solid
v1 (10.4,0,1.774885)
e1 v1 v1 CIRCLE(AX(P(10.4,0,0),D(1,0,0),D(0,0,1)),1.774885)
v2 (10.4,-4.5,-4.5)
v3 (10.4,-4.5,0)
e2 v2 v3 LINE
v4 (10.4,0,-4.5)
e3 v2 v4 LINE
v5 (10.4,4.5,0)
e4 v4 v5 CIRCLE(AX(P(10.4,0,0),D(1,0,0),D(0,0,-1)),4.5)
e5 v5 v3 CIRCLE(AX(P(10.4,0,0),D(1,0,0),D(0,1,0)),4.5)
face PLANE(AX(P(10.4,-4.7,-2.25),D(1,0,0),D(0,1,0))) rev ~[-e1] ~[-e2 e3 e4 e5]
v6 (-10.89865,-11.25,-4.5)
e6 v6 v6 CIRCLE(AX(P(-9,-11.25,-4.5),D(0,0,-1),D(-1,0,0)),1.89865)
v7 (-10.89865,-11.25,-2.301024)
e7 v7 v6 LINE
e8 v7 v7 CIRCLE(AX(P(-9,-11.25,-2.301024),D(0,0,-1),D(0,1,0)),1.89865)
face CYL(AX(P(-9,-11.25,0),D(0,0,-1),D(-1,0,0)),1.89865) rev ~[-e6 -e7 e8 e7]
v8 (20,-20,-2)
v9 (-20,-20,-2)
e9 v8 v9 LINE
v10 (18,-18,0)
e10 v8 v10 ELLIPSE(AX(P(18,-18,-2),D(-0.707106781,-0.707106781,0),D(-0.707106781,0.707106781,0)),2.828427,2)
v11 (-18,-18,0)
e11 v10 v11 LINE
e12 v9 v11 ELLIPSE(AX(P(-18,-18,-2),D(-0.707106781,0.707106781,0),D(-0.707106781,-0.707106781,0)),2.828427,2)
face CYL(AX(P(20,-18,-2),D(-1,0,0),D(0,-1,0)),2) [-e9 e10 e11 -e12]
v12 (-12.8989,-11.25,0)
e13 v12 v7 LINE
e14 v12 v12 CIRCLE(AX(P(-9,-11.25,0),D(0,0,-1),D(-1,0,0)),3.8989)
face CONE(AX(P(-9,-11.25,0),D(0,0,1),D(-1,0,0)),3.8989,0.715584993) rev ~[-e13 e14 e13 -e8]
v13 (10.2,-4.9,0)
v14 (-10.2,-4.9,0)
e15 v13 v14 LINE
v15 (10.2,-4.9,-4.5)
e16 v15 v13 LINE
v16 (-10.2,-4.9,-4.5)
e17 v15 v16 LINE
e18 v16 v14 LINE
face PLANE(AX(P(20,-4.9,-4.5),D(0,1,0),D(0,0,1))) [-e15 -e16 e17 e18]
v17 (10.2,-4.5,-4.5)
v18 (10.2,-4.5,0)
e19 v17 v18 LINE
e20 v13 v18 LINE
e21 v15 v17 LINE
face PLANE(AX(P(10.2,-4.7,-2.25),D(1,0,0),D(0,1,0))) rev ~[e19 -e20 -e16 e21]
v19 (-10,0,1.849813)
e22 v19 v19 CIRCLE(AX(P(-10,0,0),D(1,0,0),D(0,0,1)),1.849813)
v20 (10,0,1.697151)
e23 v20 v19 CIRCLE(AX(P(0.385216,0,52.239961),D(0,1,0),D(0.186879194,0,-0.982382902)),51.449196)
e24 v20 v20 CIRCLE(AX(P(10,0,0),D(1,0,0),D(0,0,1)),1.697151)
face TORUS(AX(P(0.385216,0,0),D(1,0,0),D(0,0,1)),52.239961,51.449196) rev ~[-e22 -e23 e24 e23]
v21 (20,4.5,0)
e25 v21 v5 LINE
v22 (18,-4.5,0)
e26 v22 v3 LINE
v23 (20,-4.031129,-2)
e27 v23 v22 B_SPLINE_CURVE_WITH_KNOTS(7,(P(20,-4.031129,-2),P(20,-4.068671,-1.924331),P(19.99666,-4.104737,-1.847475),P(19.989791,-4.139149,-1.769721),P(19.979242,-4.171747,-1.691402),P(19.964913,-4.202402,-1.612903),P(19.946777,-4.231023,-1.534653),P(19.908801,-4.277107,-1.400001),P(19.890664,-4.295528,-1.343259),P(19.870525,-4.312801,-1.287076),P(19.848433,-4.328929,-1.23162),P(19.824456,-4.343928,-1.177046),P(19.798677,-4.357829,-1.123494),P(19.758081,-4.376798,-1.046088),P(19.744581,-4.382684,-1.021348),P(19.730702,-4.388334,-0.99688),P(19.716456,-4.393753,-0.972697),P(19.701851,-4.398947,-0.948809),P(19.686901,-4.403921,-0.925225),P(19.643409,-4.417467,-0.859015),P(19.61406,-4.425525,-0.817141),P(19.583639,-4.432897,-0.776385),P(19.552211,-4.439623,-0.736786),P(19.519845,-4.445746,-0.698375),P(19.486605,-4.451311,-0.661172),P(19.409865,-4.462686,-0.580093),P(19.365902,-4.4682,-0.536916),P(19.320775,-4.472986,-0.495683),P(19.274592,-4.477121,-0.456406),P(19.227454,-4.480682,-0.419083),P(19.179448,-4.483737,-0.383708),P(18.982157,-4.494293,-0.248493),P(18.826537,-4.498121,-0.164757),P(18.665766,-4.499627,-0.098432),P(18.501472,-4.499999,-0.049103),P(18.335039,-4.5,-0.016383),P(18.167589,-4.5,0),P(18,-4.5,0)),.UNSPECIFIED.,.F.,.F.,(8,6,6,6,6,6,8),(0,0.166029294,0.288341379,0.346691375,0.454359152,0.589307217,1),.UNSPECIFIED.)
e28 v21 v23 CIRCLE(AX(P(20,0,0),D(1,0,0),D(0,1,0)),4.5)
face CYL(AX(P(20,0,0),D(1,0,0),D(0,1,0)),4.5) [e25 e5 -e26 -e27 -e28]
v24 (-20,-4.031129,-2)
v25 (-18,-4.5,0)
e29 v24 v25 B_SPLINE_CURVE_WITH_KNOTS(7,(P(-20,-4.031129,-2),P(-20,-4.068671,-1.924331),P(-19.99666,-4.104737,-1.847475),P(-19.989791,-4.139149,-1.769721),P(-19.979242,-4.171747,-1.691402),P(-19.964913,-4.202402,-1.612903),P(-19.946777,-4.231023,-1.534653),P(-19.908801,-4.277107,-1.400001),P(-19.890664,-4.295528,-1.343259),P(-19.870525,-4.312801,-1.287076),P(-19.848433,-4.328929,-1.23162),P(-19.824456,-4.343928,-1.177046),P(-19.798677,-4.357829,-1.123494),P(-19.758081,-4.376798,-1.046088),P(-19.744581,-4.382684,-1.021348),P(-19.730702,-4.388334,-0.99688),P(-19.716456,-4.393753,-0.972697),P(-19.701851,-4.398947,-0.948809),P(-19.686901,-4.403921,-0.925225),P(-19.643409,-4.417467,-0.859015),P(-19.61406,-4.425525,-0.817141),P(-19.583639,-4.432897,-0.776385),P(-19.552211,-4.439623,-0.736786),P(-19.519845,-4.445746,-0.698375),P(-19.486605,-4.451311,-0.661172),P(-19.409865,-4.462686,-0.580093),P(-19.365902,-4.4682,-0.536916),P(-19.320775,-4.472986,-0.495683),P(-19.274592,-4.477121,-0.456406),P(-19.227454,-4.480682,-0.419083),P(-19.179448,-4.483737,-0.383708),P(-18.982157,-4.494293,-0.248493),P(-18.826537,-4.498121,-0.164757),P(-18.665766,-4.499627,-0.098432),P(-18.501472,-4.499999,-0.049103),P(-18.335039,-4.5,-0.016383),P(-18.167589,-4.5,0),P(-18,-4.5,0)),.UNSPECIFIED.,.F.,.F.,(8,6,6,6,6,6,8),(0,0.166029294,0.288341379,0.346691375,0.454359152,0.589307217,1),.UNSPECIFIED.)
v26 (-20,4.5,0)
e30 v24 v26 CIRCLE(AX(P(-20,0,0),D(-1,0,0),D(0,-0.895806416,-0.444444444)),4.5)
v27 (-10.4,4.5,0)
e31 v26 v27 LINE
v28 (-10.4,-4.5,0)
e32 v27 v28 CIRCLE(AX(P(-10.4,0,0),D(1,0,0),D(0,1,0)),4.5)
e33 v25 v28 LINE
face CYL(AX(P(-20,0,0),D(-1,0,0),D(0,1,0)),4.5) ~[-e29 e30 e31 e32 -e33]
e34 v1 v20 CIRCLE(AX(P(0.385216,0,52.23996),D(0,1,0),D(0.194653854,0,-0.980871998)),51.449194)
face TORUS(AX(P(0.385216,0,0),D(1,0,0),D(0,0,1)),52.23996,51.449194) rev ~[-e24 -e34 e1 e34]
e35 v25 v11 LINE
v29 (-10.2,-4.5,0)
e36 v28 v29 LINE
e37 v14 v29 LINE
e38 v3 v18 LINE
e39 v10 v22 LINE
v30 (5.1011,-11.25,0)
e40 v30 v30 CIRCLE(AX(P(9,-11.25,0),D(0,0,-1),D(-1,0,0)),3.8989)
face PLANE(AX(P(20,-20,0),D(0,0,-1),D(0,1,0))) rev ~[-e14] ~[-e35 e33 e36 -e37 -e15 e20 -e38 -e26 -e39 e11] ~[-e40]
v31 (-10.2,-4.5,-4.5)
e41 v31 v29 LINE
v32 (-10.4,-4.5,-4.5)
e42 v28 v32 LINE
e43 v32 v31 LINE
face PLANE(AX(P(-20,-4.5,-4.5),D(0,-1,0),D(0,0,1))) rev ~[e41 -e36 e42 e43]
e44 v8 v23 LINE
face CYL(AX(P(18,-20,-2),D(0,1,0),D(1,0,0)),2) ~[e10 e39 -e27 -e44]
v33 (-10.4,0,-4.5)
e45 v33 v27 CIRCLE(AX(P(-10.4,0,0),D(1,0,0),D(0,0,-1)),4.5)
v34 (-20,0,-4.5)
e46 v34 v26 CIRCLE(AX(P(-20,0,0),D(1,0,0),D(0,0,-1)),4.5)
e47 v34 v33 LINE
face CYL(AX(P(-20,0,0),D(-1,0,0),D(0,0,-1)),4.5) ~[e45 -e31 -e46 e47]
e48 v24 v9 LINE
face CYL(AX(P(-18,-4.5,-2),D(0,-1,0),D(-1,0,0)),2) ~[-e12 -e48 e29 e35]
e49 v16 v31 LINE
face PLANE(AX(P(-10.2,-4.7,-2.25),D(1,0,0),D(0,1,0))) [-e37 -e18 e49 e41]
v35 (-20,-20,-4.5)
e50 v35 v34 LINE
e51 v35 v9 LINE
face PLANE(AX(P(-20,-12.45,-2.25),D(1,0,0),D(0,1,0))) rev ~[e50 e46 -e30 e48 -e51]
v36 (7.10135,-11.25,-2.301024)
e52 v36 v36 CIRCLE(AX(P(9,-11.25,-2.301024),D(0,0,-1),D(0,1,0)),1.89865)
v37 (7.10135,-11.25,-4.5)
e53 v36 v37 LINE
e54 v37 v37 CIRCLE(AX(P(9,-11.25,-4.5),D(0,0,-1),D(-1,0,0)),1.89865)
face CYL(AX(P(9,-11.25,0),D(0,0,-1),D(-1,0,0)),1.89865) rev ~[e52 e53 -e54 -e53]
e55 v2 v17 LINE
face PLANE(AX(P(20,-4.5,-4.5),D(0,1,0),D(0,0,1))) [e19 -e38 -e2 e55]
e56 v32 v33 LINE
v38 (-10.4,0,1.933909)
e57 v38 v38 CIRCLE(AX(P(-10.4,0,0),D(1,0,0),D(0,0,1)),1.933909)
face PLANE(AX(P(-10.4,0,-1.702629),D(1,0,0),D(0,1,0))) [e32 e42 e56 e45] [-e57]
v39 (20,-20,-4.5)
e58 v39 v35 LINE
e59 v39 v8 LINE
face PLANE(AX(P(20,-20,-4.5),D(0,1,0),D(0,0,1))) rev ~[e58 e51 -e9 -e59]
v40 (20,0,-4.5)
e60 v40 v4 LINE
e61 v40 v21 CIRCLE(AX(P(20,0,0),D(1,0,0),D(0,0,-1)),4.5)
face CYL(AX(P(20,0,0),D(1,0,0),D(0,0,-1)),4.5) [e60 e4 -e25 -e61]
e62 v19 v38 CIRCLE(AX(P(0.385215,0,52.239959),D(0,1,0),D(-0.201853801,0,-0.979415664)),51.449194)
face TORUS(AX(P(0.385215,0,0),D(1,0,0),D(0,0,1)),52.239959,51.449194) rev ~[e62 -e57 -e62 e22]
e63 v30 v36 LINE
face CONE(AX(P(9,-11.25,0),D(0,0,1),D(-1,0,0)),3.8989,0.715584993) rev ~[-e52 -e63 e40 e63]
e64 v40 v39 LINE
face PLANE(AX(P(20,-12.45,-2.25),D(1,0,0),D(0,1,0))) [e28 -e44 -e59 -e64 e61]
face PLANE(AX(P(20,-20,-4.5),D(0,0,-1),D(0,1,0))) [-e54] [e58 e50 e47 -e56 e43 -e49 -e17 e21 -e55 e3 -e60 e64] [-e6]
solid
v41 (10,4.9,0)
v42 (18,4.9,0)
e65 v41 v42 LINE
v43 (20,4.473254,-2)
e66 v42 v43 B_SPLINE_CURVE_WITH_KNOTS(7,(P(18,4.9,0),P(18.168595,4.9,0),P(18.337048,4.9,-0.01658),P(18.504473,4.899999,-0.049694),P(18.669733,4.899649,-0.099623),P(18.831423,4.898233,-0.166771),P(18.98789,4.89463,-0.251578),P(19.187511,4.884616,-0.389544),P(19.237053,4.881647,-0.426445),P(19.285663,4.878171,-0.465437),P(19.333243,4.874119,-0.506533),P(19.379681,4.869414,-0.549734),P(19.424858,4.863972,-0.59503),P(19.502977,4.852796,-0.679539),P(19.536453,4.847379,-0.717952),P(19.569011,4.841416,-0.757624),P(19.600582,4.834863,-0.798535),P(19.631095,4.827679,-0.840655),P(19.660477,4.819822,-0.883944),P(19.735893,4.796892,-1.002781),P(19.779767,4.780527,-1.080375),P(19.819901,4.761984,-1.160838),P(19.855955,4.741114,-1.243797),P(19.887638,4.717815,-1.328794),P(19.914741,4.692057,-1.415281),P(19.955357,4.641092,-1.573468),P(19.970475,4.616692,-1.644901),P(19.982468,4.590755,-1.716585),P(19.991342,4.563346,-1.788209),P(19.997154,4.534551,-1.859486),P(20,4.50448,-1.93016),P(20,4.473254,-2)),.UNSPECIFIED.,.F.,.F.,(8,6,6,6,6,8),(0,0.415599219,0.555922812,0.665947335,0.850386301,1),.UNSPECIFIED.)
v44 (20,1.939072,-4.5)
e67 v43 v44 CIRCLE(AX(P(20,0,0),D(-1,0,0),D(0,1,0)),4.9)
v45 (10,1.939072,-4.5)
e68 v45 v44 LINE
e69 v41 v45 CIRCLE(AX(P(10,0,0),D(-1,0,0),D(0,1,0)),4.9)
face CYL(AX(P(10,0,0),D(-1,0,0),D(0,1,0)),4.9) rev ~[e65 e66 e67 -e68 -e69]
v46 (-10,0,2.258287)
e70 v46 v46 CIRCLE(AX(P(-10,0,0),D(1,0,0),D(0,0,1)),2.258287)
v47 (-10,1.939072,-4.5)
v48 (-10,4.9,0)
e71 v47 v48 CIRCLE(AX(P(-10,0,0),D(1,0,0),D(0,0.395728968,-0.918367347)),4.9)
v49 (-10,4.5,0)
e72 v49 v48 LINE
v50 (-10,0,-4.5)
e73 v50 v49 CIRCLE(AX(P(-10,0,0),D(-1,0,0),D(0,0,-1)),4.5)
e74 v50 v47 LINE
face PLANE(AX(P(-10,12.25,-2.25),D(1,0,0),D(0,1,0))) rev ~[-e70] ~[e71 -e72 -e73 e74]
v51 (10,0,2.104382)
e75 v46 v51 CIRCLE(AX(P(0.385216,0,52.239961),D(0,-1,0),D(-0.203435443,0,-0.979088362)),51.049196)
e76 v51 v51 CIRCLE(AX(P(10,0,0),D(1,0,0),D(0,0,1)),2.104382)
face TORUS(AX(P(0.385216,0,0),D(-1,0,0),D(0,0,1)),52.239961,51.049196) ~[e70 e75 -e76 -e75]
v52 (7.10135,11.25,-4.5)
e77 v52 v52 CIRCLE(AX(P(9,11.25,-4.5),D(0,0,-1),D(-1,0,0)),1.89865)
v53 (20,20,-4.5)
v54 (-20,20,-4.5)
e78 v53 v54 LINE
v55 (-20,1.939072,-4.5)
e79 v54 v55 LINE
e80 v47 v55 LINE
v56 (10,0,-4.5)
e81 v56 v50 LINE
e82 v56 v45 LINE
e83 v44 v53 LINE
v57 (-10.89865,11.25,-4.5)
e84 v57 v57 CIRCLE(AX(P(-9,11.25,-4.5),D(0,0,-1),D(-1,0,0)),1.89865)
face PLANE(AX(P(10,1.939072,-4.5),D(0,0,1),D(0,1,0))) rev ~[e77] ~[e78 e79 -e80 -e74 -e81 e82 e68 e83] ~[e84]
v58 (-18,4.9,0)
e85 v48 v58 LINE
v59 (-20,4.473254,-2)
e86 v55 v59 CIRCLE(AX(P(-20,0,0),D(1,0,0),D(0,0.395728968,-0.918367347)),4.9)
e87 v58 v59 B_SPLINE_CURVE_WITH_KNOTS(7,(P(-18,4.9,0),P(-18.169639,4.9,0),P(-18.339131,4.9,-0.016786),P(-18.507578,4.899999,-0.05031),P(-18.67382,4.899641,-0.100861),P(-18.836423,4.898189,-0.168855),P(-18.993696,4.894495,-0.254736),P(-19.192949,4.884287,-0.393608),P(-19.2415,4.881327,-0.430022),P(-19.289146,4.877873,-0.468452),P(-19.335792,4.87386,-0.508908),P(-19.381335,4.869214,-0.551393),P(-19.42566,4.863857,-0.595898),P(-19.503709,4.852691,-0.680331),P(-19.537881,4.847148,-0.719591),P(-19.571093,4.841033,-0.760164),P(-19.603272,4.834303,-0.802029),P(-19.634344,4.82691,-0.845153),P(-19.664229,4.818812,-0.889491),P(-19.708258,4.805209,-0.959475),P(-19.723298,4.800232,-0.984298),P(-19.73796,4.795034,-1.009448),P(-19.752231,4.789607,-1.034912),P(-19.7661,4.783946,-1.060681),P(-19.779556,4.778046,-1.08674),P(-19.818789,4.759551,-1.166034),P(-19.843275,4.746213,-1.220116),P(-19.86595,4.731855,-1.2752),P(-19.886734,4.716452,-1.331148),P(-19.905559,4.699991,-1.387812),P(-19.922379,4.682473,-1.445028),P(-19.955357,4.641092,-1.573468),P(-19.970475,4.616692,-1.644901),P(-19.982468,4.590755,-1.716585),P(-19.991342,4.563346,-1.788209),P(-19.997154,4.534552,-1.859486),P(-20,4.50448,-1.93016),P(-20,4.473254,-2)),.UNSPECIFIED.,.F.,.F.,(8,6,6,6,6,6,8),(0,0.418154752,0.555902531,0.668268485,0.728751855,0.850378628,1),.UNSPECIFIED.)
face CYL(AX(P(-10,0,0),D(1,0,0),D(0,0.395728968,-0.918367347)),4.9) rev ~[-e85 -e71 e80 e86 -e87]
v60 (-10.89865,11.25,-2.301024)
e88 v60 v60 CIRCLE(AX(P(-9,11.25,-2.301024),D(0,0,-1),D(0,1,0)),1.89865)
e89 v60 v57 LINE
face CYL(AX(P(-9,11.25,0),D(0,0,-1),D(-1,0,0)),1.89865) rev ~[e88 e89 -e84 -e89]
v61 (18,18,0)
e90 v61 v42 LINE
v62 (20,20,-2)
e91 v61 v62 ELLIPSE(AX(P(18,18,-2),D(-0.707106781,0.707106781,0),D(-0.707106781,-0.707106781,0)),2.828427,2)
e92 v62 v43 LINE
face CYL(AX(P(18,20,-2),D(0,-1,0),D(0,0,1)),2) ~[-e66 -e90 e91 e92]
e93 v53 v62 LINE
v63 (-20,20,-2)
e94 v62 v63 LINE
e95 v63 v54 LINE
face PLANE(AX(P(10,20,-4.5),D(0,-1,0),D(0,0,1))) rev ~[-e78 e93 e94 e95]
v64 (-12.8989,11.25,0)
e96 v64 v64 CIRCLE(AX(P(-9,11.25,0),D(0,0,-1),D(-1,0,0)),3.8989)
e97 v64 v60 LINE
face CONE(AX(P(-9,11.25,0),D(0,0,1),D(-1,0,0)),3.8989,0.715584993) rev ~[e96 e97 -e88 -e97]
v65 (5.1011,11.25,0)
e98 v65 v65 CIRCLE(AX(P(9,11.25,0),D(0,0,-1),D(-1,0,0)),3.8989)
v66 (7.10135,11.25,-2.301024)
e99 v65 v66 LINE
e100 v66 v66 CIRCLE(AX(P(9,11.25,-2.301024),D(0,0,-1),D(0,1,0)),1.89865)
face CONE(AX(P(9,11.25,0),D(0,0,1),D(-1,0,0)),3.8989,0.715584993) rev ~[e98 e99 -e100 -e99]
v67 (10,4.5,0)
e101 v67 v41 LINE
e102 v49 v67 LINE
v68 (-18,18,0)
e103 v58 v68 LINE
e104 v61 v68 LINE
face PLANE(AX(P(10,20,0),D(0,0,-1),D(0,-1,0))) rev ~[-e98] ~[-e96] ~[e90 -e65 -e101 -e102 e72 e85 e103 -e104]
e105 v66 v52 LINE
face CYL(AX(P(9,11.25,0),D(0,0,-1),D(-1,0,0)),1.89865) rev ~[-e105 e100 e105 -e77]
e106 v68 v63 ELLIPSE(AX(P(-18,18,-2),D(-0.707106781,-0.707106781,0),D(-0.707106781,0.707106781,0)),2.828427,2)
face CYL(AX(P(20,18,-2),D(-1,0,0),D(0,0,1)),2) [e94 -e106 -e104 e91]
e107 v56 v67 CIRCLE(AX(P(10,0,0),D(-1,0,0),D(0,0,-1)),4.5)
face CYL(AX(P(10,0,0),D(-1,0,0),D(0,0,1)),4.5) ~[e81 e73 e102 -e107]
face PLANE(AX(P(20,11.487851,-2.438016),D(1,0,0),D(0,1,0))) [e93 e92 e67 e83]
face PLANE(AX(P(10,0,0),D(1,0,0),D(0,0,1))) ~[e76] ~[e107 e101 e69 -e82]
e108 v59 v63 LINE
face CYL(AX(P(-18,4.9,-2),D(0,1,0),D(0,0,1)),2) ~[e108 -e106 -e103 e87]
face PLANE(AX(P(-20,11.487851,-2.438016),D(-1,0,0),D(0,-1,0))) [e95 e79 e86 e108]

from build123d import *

# Parameters (mm, degrees)
F4_W              = 15.5
F4_H              = 4.5
F7_DEPTH          = 10
F7_DEPTH_BACK     = 10
F8_W              = 0.4
F8_H              = 4.5
F9_DEPTH          = 9.6
F11_DEPTH         = 9.6
F12_DEPTH         = 9.8
F10_W             = 0.4
F10_H             = 4.5
F13_DEPTH         = 9.8
F8_W_2            = 15.1
F14_DEPTH         = 40
F16_DEPTH         = 10
F18_DEPTH         = 10
F19_R             = 2
F19_2_R           = 2
F21_D             = 3.7973
F21_CSINK_D       = 7.7978
F21_CSINK_ANGLE   = 82
F21_2_D           = 3.7973
F21_2_CSINK_D     = 7.7978
F21_2_CSINK_ANGLE = 82


with BuildPart() as f2:
    # F1 (on Front) → F2 (revolve)
    with BuildSketch(Plane.XZ):
        with BuildLine():
            Line((-10, 1.8498126353), (-10, 0))
            Line((-10, 0), (10, 0))
            Line((10, 0), (10, 1.6971506079))
            ThreePointArc((10, 1.6971506079), (-0.0074897347, 0.7922638586), (-10, 1.8498126353))
        make_face()
        with BuildLine():
            Line((-10.4, 0), (-10, 0))
            Line((-10, 0), (-10, 1.8498126353))
            ThreePointArc((-10, 1.8498126353), (-10.2000835145, 1.8914635263), (-10.4, 1.9339088831))
            Line((-10.4, 1.9339088831), (-10.4, 0))
        make_face()
        with BuildLine():
            Line((10, 1.6971506079), (10, 0))
            Line((10, 0), (10.4, 0))
            Line((10.4, 0), (10.4, 1.774885404))
            ThreePointArc((10.4, 1.774885404), (10.2000769588, 1.7356219988), (10, 1.6971506079))
        make_face()
    revolve(axis=Axis((0, 0, 0), (1, 0, 0)))

    # F8 (on offset) → F9 (join, through all)
    with BuildSketch(Plane.YZ.offset(20)):
        with Locations((-4.7, -2.25)):
            Rectangle(F8_W, F8_H)
        with BuildLine():
            ThreePointArc((4.5, 0), (0, 4.5), (-4.5, 0))
            Line((-4.5, 0), (4.5, 0))
        make_face()
        with BuildLine():
            ThreePointArc((0, -4.5), (-3.1819805153, -3.1819805153), (-4.5, 0))
            Line((-4.5, 0), (-4.5, -4.5))
            Line((-4.5, -4.5), (0, -4.5))
        make_face()
        with BuildLine():
            Line((4.5, 0), (-4.5, 0))
            ThreePointArc((-4.5, 0), (-3.1819805153, -3.1819805153), (0, -4.5))
            ThreePointArc((0, -4.5), (3.1819805153, -3.1819805153), (4.5, 0))
        make_face()
    extrude(amount=-F9_DEPTH)

    # F10 (on offset) → F11 (join, through all)
    with BuildSketch(Plane.YZ.offset(-20)):
        with BuildLine():
            ThreePointArc((0, -4.5), (3.1819805153, -3.1819805153), (4.5, 0))
            Line((4.5, 0), (-4.5, 0))
            ThreePointArc((-4.5, 0), (-3.1819805153, -3.1819805153), (0, -4.5))
        make_face()
        with BuildLine():
            Line((-4.5, 0), (4.5, 0))
            ThreePointArc((4.5, 0), (0, 4.5), (-4.5, 0))
        make_face()
        with BuildLine():
            ThreePointArc((0, -4.5), (-3.1819805153, -3.1819805153), (-4.5, 0))
            Line((-4.5, 0), (-4.5, -4.5))
            Line((-4.5, -4.5), (0, -4.5))
        make_face()
    extrude(amount=F11_DEPTH)

    # F8 (on offset) → F12 (join)
    with BuildSketch(Plane.YZ.offset(20)):
        with Locations((-4.7, -2.25)):
            Rectangle(F8_W, F8_H)
    extrude(amount=-F12_DEPTH)

    # F10 (on offset) → F13 (join)
    with BuildSketch(Plane.YZ.offset(-20)):
        with Locations((-4.7, -2.25)):
            Rectangle(F10_W, F10_H)
    extrude(amount=F13_DEPTH)

    # F8 (on offset) → F14 (join, through all)
    with BuildSketch(Plane.YZ.offset(20)):
        with Locations((-12.45, -2.25)):
            Rectangle(F8_W_2, F8_H)
    extrude(amount=-F14_DEPTH)

    # F19
    f19_edges = [f2.edges().sort_by_distance(p)[0] for p in [
        (20, -12.25, 0),
        (0, -20, 0),
        (-20, -12.25, 0),
    ]]
    fillet(f19_edges, radius=F19_R)

    # F21 (through all)
    with Locations(Plane.XY):
        with Locations((9, 11.25), (-9, 11.25), (-9, -11.25), (9, -11.25)):
            CounterSinkHole(F21_D / 2, F21_CSINK_D / 2, counter_sink_angle=F21_CSINK_ANGLE)


with BuildPart() as f3:
    # F1 (on Front) → F3 (revolve)
    with BuildSketch(Plane.XZ):
        with BuildLine():
            Line((-10, 4.5), (-10, 2.2582874036))
            ThreePointArc((-10, 2.2582874036), (-0.0076110898, 1.1922765363), (10, 2.1043815617))
            Line((10, 2.1043815617), (10, 4.5))
            Line((10, 4.5), (-10, 4.5))
        make_face()
    revolve(axis=Axis((0, 0, 0), (1, 0, 0)))

    # F4 (on Right) → F7 (join, two sides)
    with BuildSketch(Plane.YZ) as f7_sk:
        with Locations((12.25, -2.25)):
            Rectangle(F4_W, F4_H)
        with BuildLine():
            Line((4.5, -4.5), (4.5, 0))
            ThreePointArc((4.5, 0), (3.1819805153, -3.1819805153), (0, -4.5))
            Line((0, -4.5), (4.5, -4.5))
        make_face()
    extrude(amount=F7_DEPTH)
    extrude(f7_sk.sketch, amount=-F7_DEPTH_BACK)

    # F15 (on face) → F16 (join, through all)
    with BuildSketch(Plane(origin=(-10, 0, 0), x_dir=(0, -1, 0), z_dir=(-1, 0, 0))):
        with BuildLine():
            ThreePointArc((-1.939071943, -4.5), (-4.0933759002, -2.6933759002), (-4.9, 0))
            Line((-4.9, 0), (-20, 0))
            Line((-20, 0), (-20, -4.5))
            Line((-20, -4.5), (-1.939071943, -4.5))
        make_face()
    extrude(amount=F16_DEPTH)

    # F17 (on face) → F18 (join, through all)
    with BuildSketch(Plane.YZ.offset(10)):
        with BuildLine():
            Line((20, 0), (4.9, 0))
            ThreePointArc((4.9, 0), (4.0933759002, -2.6933759002), (1.939071943, -4.5))
            Line((1.939071943, -4.5), (20, -4.5))
            Line((20, -4.5), (20, 0))
        make_face()
    extrude(amount=F18_DEPTH)

    # F19#2
    f19_2_edges = [f3.edges().sort_by_distance(p)[0] for p in [
        (20, 12.45, 0),
        (0, 20, 0),
        (-20, 12.45, 0),
    ]]
    fillet(f19_2_edges, radius=F19_2_R)

    # F21#2 (through all)
    with Locations(Plane.XY):
        with Locations((9, 11.25), (-9, 11.25), (-9, -11.25), (9, -11.25)):
            CounterSinkHole(F21_2_D / 2, F21_2_CSINK_D / 2, counter_sink_angle=F21_2_CSINK_ANGLE)


solid = Compound([f2.part, f3.part])
